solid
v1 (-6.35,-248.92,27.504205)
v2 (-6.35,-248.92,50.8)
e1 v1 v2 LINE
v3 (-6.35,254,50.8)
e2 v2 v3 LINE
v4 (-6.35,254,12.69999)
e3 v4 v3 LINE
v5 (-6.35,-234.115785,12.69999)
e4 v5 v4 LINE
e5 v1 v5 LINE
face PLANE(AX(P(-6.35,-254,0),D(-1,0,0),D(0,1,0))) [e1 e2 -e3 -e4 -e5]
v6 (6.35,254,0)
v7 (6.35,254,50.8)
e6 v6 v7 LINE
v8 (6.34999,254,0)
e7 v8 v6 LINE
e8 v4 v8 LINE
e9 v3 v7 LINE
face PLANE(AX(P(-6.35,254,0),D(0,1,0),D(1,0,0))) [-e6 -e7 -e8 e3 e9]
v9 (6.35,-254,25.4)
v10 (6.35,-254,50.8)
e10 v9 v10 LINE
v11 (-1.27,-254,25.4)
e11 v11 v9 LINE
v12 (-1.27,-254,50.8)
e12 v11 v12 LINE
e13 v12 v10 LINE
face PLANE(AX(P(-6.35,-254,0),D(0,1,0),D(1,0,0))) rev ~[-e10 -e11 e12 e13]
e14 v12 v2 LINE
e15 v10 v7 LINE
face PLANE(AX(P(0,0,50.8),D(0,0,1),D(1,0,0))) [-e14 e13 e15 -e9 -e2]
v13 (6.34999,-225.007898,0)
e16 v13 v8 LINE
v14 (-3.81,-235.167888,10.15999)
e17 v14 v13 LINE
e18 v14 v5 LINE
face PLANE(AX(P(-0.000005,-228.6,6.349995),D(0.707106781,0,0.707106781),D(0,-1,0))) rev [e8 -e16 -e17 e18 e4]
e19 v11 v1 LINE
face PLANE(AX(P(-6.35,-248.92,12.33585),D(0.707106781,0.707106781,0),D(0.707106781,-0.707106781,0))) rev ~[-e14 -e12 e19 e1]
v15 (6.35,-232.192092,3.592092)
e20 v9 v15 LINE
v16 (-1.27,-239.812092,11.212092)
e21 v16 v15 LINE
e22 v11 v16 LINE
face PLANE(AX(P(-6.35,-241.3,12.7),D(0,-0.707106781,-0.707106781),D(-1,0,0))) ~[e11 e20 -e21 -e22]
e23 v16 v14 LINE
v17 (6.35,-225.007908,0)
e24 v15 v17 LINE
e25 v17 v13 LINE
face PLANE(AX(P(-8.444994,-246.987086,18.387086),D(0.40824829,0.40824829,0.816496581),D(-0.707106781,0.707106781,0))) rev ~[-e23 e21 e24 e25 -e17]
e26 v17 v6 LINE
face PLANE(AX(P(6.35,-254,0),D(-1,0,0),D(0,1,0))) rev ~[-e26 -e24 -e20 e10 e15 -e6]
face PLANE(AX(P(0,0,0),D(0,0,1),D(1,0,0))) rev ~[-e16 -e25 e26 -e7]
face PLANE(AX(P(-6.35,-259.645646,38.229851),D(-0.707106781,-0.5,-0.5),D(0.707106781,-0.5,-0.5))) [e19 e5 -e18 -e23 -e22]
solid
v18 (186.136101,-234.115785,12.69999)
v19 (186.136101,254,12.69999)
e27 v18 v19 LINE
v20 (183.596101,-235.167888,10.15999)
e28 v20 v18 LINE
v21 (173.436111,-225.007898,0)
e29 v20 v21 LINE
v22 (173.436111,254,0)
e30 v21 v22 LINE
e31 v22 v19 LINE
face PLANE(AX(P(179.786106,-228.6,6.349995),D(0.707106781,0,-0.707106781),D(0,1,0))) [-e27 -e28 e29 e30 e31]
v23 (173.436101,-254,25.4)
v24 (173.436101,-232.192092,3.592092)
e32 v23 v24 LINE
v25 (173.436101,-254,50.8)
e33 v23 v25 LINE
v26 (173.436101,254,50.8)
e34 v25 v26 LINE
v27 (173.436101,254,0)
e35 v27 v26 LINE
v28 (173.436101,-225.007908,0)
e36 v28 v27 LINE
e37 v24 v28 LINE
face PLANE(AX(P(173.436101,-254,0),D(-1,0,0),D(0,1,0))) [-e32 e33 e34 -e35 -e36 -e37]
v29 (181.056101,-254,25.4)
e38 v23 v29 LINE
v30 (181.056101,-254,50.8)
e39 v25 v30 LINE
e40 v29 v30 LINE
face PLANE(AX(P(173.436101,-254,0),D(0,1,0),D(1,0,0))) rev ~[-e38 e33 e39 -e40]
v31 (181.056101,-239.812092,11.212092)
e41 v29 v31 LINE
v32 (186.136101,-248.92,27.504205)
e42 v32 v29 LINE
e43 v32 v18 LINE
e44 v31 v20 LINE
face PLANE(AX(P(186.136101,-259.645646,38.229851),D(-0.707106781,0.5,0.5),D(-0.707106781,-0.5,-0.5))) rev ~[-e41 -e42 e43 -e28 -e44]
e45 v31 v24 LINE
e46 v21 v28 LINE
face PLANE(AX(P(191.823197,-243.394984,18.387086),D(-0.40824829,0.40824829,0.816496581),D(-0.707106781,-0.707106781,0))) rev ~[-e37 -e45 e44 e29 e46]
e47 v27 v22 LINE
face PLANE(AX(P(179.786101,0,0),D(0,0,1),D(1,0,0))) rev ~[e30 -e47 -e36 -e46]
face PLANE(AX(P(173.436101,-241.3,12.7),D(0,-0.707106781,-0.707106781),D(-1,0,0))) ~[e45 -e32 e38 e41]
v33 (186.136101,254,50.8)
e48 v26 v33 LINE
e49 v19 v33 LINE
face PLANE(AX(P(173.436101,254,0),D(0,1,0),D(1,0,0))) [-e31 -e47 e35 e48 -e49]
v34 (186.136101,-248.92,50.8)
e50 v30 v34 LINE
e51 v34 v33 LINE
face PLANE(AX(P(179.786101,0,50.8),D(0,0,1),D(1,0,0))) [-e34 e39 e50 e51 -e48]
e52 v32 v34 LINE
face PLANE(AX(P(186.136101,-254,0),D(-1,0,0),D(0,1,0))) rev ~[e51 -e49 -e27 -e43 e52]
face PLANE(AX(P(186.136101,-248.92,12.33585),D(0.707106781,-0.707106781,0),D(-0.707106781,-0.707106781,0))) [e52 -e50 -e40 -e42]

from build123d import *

# Parameters (mm, degrees)
F0_W          = 12.7
F0_H          = 508
F1_DEPTH      = 50.8
F2_SIZE       = 25.4
F4_DEPTH      = 50.8
F5_SIZE       = 25.4
F6_SIZE       = 12.69999
F6_2_SIZE     = 12.69999
F7_T1_DEPTH   = 51.5282991577
F7_T3_DEPTH   = 44.088825542
F7_T5_DEPTH   = 11.4662899398
F7_T7_DEPTH   = 37.54990514
F7_2_T1_DEPTH = 51.5282991577
F7_2_T3_DEPTH = 44.088825542
F7_2_T5_DEPTH = 37.54990514
F7_2_T7_DEPTH = 11.4662899398


# Not quite as in the source:
# - a fillet or chamfer that OpenCascade refuses, or shapes differently, is made with other operations: its cross-section is extruded or revolved along the edge and cut away or added
# - a fillet or chamfer is up to 0.001 mm smaller than in the source, because OpenCascade refuses the exact size
# - a feature of the source that left no trace in its solid (it failed there, or was rolled back) is left out


with BuildPart() as f1:
    # F0 (on Top) → F1 (new body)
    with BuildSketch(Plane.XY):
        Rectangle(F0_W, F0_H)
    extrude(amount=F1_DEPTH)

    # F2
    f2_edges = [f1.edges().sort_by_distance(p)[0] for p in [
        (0, -254, 0),
    ]]
    chamfer(f2_edges, length=F2_SIZE)

    # F6#2 (size 12.7 in the source; OpenCascade refuses exactly that, so slightly less here)
    f6_2_edges = [f1.edges().sort_by_distance(p)[0] for p in [
        (-6.35, 12.7, 0),
    ]]
    chamfer(f6_2_edges, length=F6_2_SIZE)

    # F7: chamfer of 5.08 on 4 edges, made by hand

    # F7_s2 → F7_t1 (cut)
    with BuildSketch(Plane.XY.offset(12.3358504211)):
        Polygon((-6.35, -248.92), (-1.27, -254), (-6.35, -254), align=None)
    extrude(amount=F7_T1_DEPTH, mode=Mode.SUBTRACT)

    # F7_s4 → F7_t3 (cut)
    with BuildSketch(Plane(origin=(0, -148.9377487577, 148.9377487577), x_dir=(1, 0, 0), z_dir=(0, 0.7071067812, -0.7071067812))):
        Polygon((-6.35, 156.5646101792), (-1.27, 161.6446101792), (-6.35, 161.6446101792), align=None)
    extrude(amount=F7_T3_DEPTH, mode=Mode.SUBTRACT)

    # F7_s6 → F7_t5 (cut)
    with BuildSketch(Plane.YZ.offset(0.6168500301)):
        Polygon((-230.0878975516, 1.4878975516), (-226.4957951031, 0), (-228.6, 0), align=None)
    extrude(amount=F7_T5_DEPTH, mode=Mode.SUBTRACT)

    # F7_s8 → F7_t7 (cut)
    with BuildSketch(Plane(origin=(-91.273055587, -91.273055587, 91.273055587), x_dir=(-0.7071067812, 0.7071067812, 0), z_dir=(0.5773502692, 0.5773502692, -0.5773502692))):
        Polygon((-168.6747311687, -89.2667169543), (-163.5947311687, -89.2667169543), (-166.1347311687, -90.7331866381), align=None)
    extrude(amount=F7_T7_DEPTH, mode=Mode.SUBTRACT)


with BuildPart() as f4:
    # F0 (on Top) → F4 (new body)
    with BuildSketch(Plane.XY):
        with Locations((179.7861009836, 0)):
            Rectangle(F0_W, F0_H)
    extrude(amount=F4_DEPTH)

    # F5
    f5_edges = [f4.edges().sort_by_distance(p)[0] for p in [
        (179.786101, -254, 0),
    ]]
    chamfer(f5_edges, length=F5_SIZE)

    # F6 (size 12.7 in the source; OpenCascade refuses exactly that, so slightly less here)
    f6_edges = [f4.edges().sort_by_distance(p)[0] for p in [
        (186.136101, 12.7, 0),
    ]]
    chamfer(f6_edges, length=F6_SIZE)

    # F7#2: chamfer of 5.08 on 4 edges, made by hand

    # F7_2_s2 → F7_2_t1 (cut)
    with BuildSketch(Plane.XY.offset(12.3358504211)):
        Polygon((186.1361009836, -248.92), (181.0561009836, -254), (186.1361009836, -254), align=None)
    extrude(amount=F7_2_T1_DEPTH, mode=Mode.SUBTRACT)

    # F7_2_s4 → F7_2_t3 (cut)
    with BuildSketch(Plane(origin=(0, -148.9377487577, 148.9377487577), x_dir=(1, 0, 0), z_dir=(0, 0.7071067812, -0.7071067812))):
        Polygon((186.1361009836, 156.5646101792), (181.0561009836, 161.6446101792), (186.1361009836, 161.6446101792), align=None)
    extrude(amount=F7_2_T3_DEPTH, mode=Mode.SUBTRACT)

    # F7_2_s6 → F7_2_t5 (cut)
    with BuildSketch(Plane(origin=(151.2017559148, -151.2017559148, 151.2017559148), x_dir=(-0.7071067812, -0.7071067812, 0), z_dir=(-0.5773502692, 0.5773502692, -0.5773502692))):
        Polygon((36.4667600001, -162.6640853301), (41.5467600001, -162.6640853301), (39.0067600001, -164.1305550138), align=None)
    extrude(amount=F7_2_T5_DEPTH, mode=Mode.SUBTRACT)

    # F7_2_s8 → F7_2_t7 (cut)
    with BuildSketch(Plane.YZ.offset(167.7029610137)):
        Polygon((-226.4957951031, 0), (-230.0878975516, 1.4878975516), (-228.6, 0), align=None)
    extrude(amount=F7_2_T7_DEPTH, mode=Mode.SUBTRACT)


solid = Compound([f1.part, f4.part])
